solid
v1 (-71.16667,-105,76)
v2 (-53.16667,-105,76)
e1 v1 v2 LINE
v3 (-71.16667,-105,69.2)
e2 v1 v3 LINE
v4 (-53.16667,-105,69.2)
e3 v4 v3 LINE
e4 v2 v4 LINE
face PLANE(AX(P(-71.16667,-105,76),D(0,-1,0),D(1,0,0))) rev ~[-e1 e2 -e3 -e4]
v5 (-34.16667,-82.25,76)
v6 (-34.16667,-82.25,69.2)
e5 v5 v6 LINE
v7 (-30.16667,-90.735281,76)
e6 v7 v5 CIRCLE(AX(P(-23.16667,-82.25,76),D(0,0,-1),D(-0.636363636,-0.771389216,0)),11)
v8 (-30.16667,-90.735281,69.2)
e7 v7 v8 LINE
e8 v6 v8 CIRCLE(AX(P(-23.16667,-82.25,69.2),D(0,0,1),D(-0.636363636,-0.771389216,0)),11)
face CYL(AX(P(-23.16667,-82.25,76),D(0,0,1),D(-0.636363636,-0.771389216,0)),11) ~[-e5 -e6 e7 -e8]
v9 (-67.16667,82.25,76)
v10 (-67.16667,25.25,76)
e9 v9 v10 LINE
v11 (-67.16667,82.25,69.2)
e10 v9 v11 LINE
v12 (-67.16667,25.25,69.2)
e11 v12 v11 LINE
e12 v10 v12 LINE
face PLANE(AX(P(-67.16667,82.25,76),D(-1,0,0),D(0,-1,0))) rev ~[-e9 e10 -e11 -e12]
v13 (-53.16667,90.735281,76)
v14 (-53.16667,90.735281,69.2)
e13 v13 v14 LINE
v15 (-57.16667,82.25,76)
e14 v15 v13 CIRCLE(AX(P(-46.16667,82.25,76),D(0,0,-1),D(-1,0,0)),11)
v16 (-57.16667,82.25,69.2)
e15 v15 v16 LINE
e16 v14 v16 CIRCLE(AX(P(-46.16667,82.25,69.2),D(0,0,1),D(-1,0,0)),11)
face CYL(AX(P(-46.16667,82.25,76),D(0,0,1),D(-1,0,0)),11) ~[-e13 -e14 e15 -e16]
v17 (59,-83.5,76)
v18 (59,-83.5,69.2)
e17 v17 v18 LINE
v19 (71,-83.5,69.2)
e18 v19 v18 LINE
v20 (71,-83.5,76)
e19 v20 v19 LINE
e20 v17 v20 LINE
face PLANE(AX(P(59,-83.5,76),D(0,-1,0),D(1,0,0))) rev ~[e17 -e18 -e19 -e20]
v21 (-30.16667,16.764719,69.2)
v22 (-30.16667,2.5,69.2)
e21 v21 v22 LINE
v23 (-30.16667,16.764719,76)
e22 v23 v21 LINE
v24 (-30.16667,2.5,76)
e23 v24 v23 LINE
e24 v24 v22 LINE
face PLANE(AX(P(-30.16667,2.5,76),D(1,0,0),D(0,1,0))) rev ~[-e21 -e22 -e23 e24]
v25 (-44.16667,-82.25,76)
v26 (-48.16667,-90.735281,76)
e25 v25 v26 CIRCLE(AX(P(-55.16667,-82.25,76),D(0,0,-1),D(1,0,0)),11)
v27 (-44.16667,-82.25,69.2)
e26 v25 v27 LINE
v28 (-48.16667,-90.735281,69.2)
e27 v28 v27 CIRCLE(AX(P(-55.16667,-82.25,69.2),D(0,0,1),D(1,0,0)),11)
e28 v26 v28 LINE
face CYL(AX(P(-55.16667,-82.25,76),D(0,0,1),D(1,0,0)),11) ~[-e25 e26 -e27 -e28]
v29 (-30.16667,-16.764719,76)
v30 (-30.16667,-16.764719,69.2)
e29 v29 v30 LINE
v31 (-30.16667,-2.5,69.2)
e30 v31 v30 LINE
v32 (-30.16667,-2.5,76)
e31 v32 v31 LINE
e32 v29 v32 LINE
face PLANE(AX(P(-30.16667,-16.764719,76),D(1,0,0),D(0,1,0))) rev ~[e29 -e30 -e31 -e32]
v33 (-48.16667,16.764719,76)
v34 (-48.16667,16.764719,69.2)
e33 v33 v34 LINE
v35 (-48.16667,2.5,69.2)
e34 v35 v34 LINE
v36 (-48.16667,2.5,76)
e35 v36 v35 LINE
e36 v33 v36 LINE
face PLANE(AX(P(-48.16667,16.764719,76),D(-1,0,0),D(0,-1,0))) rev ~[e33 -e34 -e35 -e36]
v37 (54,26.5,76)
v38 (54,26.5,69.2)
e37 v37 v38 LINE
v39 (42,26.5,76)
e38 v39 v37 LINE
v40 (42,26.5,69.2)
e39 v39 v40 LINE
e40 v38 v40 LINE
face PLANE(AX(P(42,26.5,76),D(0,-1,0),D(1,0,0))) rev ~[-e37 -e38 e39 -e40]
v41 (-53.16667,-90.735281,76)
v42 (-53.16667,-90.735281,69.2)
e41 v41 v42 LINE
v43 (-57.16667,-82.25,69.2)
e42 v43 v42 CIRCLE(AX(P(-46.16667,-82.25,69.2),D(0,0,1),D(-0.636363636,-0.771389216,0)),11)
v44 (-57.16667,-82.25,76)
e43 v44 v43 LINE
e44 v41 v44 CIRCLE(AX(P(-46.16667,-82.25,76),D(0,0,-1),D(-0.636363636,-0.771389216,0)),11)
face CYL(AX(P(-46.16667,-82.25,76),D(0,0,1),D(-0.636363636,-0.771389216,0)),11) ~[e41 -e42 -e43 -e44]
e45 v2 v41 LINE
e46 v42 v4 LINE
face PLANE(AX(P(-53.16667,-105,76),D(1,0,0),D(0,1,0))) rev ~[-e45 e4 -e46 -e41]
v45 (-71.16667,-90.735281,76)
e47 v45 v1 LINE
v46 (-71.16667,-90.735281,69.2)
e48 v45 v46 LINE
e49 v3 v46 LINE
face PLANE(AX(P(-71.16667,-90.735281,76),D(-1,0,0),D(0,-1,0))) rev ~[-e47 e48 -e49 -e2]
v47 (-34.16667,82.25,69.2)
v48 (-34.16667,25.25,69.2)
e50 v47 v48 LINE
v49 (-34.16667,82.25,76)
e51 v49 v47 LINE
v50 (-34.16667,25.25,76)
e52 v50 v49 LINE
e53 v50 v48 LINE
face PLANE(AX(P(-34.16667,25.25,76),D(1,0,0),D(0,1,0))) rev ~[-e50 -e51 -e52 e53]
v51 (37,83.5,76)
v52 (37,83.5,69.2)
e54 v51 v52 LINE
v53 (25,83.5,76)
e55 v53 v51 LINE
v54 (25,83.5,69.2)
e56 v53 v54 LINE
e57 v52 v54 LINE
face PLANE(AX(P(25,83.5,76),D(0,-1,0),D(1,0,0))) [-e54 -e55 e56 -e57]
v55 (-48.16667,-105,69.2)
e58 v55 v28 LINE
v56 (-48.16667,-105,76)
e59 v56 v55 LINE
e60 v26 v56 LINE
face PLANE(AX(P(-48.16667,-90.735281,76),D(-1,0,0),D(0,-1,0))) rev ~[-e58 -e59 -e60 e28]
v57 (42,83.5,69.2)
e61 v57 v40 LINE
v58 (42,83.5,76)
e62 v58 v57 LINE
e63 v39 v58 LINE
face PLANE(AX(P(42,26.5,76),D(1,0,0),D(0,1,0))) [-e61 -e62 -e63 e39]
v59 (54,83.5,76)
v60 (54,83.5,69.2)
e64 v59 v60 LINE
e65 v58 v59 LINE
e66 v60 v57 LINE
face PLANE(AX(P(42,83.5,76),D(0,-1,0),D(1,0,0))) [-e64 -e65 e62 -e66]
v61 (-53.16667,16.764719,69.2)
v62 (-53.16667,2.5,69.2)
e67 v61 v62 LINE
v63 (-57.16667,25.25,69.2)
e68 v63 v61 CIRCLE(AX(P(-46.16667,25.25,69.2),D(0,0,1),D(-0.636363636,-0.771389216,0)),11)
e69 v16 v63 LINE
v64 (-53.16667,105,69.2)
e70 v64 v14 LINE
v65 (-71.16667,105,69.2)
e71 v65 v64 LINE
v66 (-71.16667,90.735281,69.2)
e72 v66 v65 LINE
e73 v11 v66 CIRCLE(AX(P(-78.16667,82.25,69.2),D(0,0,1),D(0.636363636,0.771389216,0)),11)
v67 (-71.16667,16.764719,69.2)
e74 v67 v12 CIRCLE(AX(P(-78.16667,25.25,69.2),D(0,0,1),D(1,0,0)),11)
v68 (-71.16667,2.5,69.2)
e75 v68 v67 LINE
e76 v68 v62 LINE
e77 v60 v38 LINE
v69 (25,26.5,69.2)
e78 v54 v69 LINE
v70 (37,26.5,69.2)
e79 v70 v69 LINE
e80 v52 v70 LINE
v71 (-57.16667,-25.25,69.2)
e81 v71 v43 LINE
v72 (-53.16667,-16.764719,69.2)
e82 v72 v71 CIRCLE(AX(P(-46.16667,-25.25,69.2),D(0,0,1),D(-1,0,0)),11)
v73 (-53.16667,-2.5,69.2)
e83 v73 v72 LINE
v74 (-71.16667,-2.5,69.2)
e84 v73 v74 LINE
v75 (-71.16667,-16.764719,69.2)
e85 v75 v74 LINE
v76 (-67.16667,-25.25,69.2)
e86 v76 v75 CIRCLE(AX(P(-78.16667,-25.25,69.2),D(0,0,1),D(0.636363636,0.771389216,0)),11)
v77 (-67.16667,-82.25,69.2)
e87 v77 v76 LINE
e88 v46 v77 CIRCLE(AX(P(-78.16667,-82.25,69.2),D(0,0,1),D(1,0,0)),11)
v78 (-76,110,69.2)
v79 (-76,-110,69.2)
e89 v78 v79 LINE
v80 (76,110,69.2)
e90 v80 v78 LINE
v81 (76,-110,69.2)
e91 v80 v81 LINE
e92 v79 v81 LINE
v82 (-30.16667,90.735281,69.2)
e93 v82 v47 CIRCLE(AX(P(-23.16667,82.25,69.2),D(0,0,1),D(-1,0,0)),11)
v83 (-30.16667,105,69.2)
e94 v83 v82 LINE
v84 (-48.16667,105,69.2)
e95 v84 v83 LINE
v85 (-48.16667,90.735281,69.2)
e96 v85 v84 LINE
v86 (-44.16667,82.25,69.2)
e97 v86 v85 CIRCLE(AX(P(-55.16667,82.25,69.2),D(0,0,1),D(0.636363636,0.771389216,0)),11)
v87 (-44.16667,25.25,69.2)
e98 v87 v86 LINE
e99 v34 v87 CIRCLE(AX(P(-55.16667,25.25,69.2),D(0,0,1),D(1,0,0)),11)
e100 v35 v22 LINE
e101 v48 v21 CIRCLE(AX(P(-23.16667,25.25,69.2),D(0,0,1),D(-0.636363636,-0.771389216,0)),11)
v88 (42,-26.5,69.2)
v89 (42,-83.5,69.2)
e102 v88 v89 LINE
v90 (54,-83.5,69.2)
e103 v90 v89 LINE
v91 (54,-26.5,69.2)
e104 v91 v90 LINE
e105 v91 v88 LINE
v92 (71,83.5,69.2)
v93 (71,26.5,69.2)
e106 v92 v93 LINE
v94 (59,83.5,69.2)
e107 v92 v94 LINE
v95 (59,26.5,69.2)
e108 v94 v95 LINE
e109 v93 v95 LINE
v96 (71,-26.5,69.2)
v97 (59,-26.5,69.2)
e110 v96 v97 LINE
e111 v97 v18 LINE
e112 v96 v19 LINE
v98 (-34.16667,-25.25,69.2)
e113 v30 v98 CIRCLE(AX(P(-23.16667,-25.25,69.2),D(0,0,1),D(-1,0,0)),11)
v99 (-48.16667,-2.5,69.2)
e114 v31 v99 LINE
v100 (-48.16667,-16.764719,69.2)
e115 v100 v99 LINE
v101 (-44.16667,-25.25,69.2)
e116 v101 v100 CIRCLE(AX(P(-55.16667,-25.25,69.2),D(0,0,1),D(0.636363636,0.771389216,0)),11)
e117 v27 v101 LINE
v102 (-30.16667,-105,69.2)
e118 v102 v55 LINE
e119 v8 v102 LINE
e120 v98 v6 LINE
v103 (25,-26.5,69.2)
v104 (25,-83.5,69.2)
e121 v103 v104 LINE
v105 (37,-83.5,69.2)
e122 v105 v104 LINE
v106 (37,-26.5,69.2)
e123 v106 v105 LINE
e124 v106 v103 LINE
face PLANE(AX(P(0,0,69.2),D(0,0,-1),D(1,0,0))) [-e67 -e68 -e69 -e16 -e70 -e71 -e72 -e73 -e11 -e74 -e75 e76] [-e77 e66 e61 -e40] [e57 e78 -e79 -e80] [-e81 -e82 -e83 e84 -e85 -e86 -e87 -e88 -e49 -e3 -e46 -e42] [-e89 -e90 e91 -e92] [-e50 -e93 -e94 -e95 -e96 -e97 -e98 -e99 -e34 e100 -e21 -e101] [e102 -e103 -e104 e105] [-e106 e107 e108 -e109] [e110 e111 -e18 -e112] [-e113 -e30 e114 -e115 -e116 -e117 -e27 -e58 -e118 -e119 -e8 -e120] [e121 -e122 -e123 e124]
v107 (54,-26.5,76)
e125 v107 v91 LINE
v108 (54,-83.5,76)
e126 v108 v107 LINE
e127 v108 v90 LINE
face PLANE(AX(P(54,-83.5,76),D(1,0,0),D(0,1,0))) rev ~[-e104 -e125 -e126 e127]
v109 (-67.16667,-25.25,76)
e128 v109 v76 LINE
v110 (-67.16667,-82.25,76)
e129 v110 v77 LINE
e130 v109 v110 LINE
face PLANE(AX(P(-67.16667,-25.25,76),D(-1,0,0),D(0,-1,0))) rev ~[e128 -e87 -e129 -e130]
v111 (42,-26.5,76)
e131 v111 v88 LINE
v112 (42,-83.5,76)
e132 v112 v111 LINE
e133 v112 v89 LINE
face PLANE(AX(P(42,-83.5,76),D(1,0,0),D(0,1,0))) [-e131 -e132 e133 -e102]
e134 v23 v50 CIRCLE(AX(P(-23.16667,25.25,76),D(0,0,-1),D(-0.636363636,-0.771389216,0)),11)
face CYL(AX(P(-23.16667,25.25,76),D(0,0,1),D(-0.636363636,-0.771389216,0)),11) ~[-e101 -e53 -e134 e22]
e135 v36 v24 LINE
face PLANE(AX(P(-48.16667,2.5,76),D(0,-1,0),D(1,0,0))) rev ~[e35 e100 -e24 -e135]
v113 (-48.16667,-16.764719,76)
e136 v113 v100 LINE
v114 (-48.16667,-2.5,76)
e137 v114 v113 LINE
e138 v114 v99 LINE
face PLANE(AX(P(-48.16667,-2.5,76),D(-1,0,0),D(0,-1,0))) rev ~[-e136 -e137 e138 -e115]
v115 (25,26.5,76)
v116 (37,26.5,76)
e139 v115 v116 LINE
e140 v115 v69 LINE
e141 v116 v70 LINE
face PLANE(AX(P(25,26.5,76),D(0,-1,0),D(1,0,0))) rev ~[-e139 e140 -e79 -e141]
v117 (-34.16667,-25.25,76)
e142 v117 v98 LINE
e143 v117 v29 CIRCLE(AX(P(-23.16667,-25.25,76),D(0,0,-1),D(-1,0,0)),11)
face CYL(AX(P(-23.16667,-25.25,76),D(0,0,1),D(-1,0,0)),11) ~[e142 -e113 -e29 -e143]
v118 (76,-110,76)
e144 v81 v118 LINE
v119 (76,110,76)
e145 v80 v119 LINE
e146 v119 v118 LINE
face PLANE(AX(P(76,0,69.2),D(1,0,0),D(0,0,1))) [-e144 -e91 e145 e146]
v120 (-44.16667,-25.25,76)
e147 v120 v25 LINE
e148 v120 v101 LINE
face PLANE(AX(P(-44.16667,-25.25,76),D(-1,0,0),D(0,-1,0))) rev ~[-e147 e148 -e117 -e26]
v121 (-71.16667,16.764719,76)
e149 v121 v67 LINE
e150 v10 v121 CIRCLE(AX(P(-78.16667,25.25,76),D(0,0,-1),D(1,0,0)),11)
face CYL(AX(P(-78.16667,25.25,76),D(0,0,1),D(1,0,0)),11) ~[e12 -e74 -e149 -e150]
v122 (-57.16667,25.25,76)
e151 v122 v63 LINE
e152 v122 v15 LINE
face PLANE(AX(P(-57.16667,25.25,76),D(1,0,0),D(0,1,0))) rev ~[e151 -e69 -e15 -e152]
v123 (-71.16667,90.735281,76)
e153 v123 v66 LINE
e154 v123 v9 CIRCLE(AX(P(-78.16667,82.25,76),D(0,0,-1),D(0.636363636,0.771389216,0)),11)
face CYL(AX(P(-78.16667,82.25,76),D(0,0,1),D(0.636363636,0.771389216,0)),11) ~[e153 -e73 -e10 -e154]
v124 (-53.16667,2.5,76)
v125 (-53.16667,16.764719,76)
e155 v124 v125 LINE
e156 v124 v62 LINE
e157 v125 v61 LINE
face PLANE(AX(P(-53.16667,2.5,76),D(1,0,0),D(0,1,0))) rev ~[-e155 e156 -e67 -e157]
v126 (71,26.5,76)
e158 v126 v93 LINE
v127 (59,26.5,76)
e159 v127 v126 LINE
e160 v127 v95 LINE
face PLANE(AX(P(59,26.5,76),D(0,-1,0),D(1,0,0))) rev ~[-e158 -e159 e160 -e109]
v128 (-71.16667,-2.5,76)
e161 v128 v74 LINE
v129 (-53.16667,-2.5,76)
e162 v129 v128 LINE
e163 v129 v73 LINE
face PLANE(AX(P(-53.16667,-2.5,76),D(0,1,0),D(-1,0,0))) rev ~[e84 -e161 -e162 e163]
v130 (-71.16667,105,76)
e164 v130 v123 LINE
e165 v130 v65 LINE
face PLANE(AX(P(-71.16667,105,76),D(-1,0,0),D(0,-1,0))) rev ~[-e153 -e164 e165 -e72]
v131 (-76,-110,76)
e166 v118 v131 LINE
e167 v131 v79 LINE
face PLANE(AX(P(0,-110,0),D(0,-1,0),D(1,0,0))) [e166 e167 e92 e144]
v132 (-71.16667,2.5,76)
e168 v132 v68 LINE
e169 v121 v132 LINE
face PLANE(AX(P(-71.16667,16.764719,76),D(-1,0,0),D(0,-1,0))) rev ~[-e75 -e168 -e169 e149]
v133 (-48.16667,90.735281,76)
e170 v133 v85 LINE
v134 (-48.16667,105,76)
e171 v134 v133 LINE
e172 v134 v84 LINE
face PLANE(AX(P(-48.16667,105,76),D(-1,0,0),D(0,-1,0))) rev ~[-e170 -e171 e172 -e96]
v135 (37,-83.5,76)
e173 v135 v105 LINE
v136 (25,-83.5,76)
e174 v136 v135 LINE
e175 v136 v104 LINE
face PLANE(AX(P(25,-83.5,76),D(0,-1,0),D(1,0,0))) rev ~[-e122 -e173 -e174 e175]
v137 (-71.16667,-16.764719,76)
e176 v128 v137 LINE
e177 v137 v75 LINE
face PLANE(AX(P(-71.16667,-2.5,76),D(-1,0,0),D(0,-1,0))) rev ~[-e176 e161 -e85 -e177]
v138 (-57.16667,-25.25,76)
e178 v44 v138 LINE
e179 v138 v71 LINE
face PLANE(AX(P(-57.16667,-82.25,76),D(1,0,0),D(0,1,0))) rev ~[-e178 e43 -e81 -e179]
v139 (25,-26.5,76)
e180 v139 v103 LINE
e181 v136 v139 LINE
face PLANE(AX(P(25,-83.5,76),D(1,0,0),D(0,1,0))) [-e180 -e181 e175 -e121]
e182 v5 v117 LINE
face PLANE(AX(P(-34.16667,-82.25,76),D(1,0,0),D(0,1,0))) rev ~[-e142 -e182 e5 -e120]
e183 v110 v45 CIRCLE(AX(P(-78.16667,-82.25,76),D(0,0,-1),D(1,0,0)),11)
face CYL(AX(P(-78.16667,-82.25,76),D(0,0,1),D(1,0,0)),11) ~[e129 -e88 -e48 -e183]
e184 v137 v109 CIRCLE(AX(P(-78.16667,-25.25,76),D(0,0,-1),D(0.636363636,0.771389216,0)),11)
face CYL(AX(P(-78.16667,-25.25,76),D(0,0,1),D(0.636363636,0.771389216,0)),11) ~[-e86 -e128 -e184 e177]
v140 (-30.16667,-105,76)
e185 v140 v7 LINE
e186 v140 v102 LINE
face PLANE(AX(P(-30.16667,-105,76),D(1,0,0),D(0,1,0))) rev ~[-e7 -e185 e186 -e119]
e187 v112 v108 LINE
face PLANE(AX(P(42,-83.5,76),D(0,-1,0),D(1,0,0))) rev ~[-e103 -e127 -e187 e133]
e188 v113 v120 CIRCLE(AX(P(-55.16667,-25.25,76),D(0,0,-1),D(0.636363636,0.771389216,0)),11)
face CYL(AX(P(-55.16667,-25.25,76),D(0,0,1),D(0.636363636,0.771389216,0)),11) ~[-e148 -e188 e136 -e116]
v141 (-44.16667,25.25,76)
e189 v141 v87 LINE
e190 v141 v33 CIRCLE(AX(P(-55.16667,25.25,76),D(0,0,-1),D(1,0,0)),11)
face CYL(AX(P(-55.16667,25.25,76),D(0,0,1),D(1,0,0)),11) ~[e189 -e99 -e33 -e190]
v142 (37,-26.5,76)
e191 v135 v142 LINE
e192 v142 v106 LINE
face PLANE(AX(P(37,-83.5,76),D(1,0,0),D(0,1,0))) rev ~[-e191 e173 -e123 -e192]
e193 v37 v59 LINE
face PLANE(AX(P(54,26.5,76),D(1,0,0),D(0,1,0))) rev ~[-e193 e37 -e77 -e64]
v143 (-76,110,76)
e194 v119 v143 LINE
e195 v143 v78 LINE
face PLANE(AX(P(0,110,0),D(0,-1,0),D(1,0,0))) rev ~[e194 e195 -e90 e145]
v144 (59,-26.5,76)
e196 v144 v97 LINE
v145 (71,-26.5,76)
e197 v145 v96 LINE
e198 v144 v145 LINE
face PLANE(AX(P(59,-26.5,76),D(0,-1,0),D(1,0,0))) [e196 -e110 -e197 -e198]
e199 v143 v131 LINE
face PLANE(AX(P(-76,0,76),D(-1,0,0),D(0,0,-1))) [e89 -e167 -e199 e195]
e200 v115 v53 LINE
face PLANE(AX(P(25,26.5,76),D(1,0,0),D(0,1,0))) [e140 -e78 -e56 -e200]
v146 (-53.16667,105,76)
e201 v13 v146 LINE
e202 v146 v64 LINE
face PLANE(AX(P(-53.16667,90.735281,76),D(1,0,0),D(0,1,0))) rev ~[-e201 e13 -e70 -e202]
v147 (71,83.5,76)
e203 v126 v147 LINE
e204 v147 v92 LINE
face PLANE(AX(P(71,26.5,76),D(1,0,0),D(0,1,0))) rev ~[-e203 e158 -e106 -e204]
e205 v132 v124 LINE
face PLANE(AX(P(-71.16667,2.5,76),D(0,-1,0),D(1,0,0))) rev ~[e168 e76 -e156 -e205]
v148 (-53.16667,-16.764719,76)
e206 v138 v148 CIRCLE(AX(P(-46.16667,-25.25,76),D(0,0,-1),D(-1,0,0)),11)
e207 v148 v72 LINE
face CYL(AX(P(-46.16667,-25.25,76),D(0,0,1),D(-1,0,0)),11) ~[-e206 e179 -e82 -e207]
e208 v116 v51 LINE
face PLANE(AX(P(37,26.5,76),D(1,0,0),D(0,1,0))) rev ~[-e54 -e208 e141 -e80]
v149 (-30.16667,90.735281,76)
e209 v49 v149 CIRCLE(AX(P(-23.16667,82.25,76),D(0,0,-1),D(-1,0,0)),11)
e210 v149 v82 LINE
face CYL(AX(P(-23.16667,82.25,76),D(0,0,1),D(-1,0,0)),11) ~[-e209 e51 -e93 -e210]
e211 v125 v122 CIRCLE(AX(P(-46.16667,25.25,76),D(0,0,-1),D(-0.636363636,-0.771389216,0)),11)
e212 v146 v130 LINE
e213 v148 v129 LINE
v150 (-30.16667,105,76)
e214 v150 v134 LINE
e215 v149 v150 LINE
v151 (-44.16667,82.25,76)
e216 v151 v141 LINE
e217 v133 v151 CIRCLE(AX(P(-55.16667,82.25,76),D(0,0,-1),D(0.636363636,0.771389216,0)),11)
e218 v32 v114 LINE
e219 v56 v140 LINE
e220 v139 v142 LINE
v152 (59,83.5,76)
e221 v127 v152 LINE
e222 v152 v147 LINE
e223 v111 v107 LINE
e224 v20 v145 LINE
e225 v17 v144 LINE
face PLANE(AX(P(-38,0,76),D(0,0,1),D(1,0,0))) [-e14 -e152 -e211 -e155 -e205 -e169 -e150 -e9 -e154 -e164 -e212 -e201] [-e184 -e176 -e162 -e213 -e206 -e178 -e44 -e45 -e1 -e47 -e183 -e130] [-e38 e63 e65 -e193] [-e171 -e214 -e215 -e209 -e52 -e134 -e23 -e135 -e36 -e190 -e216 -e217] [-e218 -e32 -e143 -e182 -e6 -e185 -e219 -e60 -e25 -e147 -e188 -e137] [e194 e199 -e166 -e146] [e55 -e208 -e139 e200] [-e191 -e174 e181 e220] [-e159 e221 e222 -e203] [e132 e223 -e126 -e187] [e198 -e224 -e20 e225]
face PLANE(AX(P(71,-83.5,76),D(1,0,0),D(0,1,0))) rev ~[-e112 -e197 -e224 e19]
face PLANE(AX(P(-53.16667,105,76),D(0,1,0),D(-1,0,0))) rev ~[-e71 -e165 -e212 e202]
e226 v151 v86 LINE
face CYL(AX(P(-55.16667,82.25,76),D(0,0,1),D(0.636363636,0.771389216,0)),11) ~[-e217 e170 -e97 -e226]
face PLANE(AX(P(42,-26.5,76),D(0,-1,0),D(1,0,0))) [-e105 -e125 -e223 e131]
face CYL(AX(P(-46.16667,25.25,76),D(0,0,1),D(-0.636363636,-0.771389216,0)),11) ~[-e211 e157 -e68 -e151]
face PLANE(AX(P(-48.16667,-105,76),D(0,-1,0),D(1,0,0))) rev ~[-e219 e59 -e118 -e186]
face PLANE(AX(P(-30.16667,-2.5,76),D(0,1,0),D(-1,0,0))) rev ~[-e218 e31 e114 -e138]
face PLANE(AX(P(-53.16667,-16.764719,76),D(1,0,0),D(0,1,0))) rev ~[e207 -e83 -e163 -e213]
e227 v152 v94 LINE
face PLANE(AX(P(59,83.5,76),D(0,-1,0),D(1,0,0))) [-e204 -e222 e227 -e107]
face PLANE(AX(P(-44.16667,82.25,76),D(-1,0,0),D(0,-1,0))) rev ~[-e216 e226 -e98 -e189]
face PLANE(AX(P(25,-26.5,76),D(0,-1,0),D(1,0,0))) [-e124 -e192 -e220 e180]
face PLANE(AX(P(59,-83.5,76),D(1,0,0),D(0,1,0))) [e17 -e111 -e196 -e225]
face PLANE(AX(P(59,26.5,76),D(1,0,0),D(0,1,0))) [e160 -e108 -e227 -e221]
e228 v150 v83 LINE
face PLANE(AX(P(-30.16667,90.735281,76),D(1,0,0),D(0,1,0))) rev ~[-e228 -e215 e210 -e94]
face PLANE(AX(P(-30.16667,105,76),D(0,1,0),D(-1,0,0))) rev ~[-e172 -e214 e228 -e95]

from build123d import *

# Parameters (mm, degrees)
F1_DEPTH = 110
F2_W     = 76
F2_H     = 8
F3_DEPTH = 152
F4_W     = 12
F4_H     = 57
F5_DEPTH = 152
F6_W     = 152
F6_H     = 220
F6_W_2   = 12
F6_H_2   = 57
F7_DEPTH = 145.2


# Not quite as in the source:
# - a feature names something its author has since deleted; it is built from what else it names


with BuildPart() as f1:
    # F0 (on Front) → F1 (new body, symmetric)
    with BuildSketch(Plane.XZ):
        with BuildLine():
            ThreePointArc((11.95, -69.2), (5.6567496474, -66.5932503526), (3.05, -60.3))
            Line((3.05, -60.3), (3.05, 60.3))
            ThreePointArc((3.05, 60.3), (5.6567496474, 66.5932503526), (11.95, 69.2))
            Line((11.95, 69.2), (76, 69.2))
            Line((76, 69.2), (76, 76))
            Line((76, 76), (-76, 76))
            Line((-76, 76), (-76, 69.2))
            Line((-76, 69.2), (-11.95, 69.2))
            ThreePointArc((-11.95, 69.2), (-5.6567496474, 66.5932503526), (-3.05, 60.3))
            Line((-3.05, 60.3), (-3.05, -60.3))
            ThreePointArc((-3.05, -60.3), (-5.6567496474, -66.5932503526), (-11.95, -69.2))
            Line((-11.95, -69.2), (-76, -69.2))
            Line((-76, -69.2), (-76, -76))
            Line((-76, -76), (76, -76))
            Line((76, -76), (76, -69.2))
            Line((76, -69.2), (11.95, -69.2))
        make_face()
    extrude(amount=F1_DEPTH, both=True)

    # F2 (on face) → F3 (join)
    with BuildSketch(Plane.XY.offset(76)):
        with Locations((-38, 0)):
            Rectangle(F2_W, F2_H)
    extrude(amount=-F3_DEPTH)

    # F4 (on face) → F5 (cut)
    with BuildSketch(Plane.XY.offset(76)):
        with BuildLine():
            ThreePointArc((-48.16667, 90.7352813742), (-45.2167956289, 86.9404157598), (-44.16667, 82.25))
            Line((-44.16667, 82.25), (-44.16667, 25.25))
            ThreePointArc((-44.16667, 25.25), (-45.2167956289, 20.5595842402), (-48.16667, 16.7647186258))
            Line((-48.16667, 16.7647186258), (-48.16667, 2.5))
            Line((-48.16667, 2.5), (-30.16667, 2.5))
            Line((-30.16667, 2.5), (-30.16667, 16.7647186258))
            ThreePointArc((-30.16667, 16.7647186258), (-33.1165443711, 20.5595842402), (-34.16667, 25.25))
            Line((-34.16667, 25.25), (-34.16667, 82.25))
            ThreePointArc((-34.16667, 82.25), (-33.1165443711, 86.9404157598), (-30.16667, 90.7352813742))
            Line((-30.16667, 90.7352813742), (-30.16667, 105))
            Line((-30.16667, 105), (-48.16667, 105))
            Line((-48.16667, 105), (-48.16667, 90.7352813742))
        make_face()
        with BuildLine():
            Line((-71.16667, 2.5), (-53.16667, 2.5))
            Line((-53.16667, 2.5), (-53.16667, 16.7647186258))
            ThreePointArc((-53.16667, 16.7647186258), (-56.1165443711, 20.5595842402), (-57.16667, 25.25))
            Line((-57.16667, 25.25), (-57.16667, 82.25))
            ThreePointArc((-57.16667, 82.25), (-56.1165443711, 86.9404157598), (-53.16667, 90.7352813742))
            Line((-53.16667, 90.7352813742), (-53.16667, 105))
            Line((-53.16667, 105), (-71.16667, 105))
            Line((-71.16667, 105), (-71.16667, 90.7352813742))
            ThreePointArc((-71.16667, 90.7352813742), (-68.2167956289, 86.9404157598), (-67.16667, 82.25))
            Line((-67.16667, 82.25), (-67.16667, 25.25))
            ThreePointArc((-67.16667, 25.25), (-68.2167956289, 20.5595842402), (-71.16667, 16.7647186258))
            Line((-71.16667, 16.7647186258), (-71.16667, 2.5))
        make_face()
        with Locations((31, 55)):
            Rectangle(F4_W, F4_H)
        with Locations((48, 55)):
            Rectangle(F4_W, F4_H)
        with Locations((65, 55)):
            Rectangle(F4_W, F4_H)
        with Locations((31, -55)):
            Rectangle(F4_W, F4_H)
        with Locations((48, -55)):
            Rectangle(F4_W, F4_H)
        with Locations((65, -55)):
            Rectangle(F4_W, F4_H)
        with BuildLine():
            Line((-71.16667, -105), (-53.16667, -105))
            Line((-53.16667, -105), (-53.16667, -90.7352813742))
            ThreePointArc((-53.16667, -90.7352813742), (-56.1165443711, -86.9404157598), (-57.16667, -82.25))
            Line((-57.16667, -82.25), (-57.16667, -25.25))
            ThreePointArc((-57.16667, -25.25), (-56.1165443711, -20.5595842402), (-53.16667, -16.7647186258))
            Line((-53.16667, -16.7647186258), (-53.16667, -2.5))
            Line((-53.16667, -2.5), (-71.16667, -2.5))
            Line((-71.16667, -2.5), (-71.16667, -16.7647186258))
            ThreePointArc((-71.16667, -16.7647186258), (-68.2167956289, -20.5595842402), (-67.16667, -25.25))
            Line((-67.16667, -25.25), (-67.16667, -82.25))
            ThreePointArc((-67.16667, -82.25), (-68.2167956289, -86.9404157598), (-71.16667, -90.7352813742))
            Line((-71.16667, -90.7352813742), (-71.16667, -105))
        make_face()
        with BuildLine():
            ThreePointArc((-48.16667, -16.7647186258), (-45.2167956289, -20.5595842402), (-44.16667, -25.25))
            Line((-44.16667, -25.25), (-44.16667, -82.25))
            ThreePointArc((-44.16667, -82.25), (-45.2167956289, -86.9404157598), (-48.16667, -90.7352813742))
            Line((-48.16667, -90.7352813742), (-48.16667, -105))
            Line((-48.16667, -105), (-30.16667, -105))
            Line((-30.16667, -105), (-30.16667, -90.7352813742))
            ThreePointArc((-30.16667, -90.7352813742), (-33.1165443711, -86.9404157598), (-34.16667, -82.25))
            Line((-34.16667, -82.25), (-34.16667, -25.25))
            ThreePointArc((-34.16667, -25.25), (-33.1165443711, -20.5595842402), (-30.16667, -16.7647186258))
            Line((-30.16667, -16.7647186258), (-30.16667, -2.5))
            Line((-30.16667, -2.5), (-48.16667, -2.5))
            Line((-48.16667, -2.5), (-48.16667, -16.7647186258))
        make_face()
    extrude(amount=-F5_DEPTH, mode=Mode.SUBTRACT)

    # F6 (on face) → F7 (cut)
    with BuildSketch(Plane(origin=(0, 0, -76), x_dir=(1, 0, 0), z_dir=(0, 0, -1))):
        Rectangle(F6_W, F6_H)
        with BuildLine():
            Line((-67.16667, -82.25), (-67.16667, -25.25))
            ThreePointArc((-67.16667, -25.25), (-68.2167956289, -20.5595842402), (-71.16667, -16.7647186258))
            Line((-71.16667, -16.7647186258), (-71.16667, -2.5))
            Line((-71.16667, -2.5), (-53.16667, -2.5))
            Line((-53.16667, -2.5), (-53.16667, -16.7647186258))
            ThreePointArc((-53.16667, -16.7647186258), (-56.1165443711, -20.5595842402), (-57.16667, -25.25))
            Line((-57.16667, -25.25), (-57.16667, -82.25))
            ThreePointArc((-57.16667, -82.25), (-56.1165443711, -86.9404157598), (-53.16667, -90.7352813742))
            Line((-53.16667, -90.7352813742), (-53.16667, -105))
            Line((-53.16667, -105), (-71.16667, -105))
            Line((-71.16667, -105), (-71.16667, -90.7352813742))
            ThreePointArc((-71.16667, -90.7352813742), (-68.2167956289, -86.9404157598), (-67.16667, -82.25))
        make_face(mode=Mode.SUBTRACT)
        with BuildLine():
            Line((-30.16667, -105), (-48.16667, -105))
            Line((-48.16667, -105), (-48.16667, -90.7352813742))
            ThreePointArc((-48.16667, -90.7352813742), (-45.2167956289, -86.9404157598), (-44.16667, -82.25))
            Line((-44.16667, -82.25), (-44.16667, -25.25))
            ThreePointArc((-44.16667, -25.25), (-45.2167956289, -20.5595842402), (-48.16667, -16.7647186258))
            Line((-48.16667, -16.7647186258), (-48.16667, -2.5))
            Line((-48.16667, -2.5), (-30.16667, -2.5))
            Line((-30.16667, -2.5), (-30.16667, -16.7647186258))
            ThreePointArc((-30.16667, -16.7647186258), (-33.1165443711, -20.5595842402), (-34.16667, -25.25))
            Line((-34.16667, -25.25), (-34.16667, -82.25))
            ThreePointArc((-34.16667, -82.25), (-33.1165443711, -86.9404157598), (-30.16667, -90.7352813742))
            Line((-30.16667, -90.7352813742), (-30.16667, -105))
        make_face(mode=Mode.SUBTRACT)
        with Locations((31, -55)):
            Rectangle(F6_W_2, F6_H_2, mode=Mode.SUBTRACT)
        with Locations((48, -55)):
            Rectangle(F6_W_2, F6_H_2, mode=Mode.SUBTRACT)
        with Locations((65, -55)):
            Rectangle(F6_W_2, F6_H_2, mode=Mode.SUBTRACT)
        with BuildLine():
            ThreePointArc((-67.16667, 82.25), (-68.2167956289, 86.9404157598), (-71.16667, 90.7352813742))
            Line((-71.16667, 90.7352813742), (-71.16667, 105))
            Line((-71.16667, 105), (-53.16667, 105))
            Line((-53.16667, 105), (-53.16667, 90.7352813742))
            ThreePointArc((-53.16667, 90.7352813742), (-56.1165443711, 86.9404157598), (-57.16667, 82.25))
            Line((-57.16667, 82.25), (-57.16667, 25.25))
            ThreePointArc((-57.16667, 25.25), (-56.1165443711, 20.5595842402), (-53.16667, 16.7647186258))
            Line((-53.16667, 16.7647186258), (-53.16667, 2.5))
            Line((-53.16667, 2.5), (-71.16667, 2.5))
            Line((-71.16667, 2.5), (-71.16667, 16.7647186258))
            ThreePointArc((-71.16667, 16.7647186258), (-68.2167956289, 20.5595842402), (-67.16667, 25.25))
            Line((-67.16667, 25.25), (-67.16667, 82.25))
        make_face(mode=Mode.SUBTRACT)
        with BuildLine():
            Line((-30.16667, 2.5), (-48.16667, 2.5))
            Line((-48.16667, 2.5), (-48.16667, 16.7647186258))
            ThreePointArc((-48.16667, 16.7647186258), (-45.2167956289, 20.5595842402), (-44.16667, 25.25))
            Line((-44.16667, 25.25), (-44.16667, 82.25))
            ThreePointArc((-44.16667, 82.25), (-45.2167956289, 86.9404157598), (-48.16667, 90.7352813742))
            Line((-48.16667, 90.7352813742), (-48.16667, 105))
            Line((-48.16667, 105), (-30.16667, 105))
            Line((-30.16667, 105), (-30.16667, 90.7352813742))
            ThreePointArc((-30.16667, 90.7352813742), (-33.1165443711, 86.9404157598), (-34.16667, 82.25))
            Line((-34.16667, 82.25), (-34.16667, 25.25))
            ThreePointArc((-34.16667, 25.25), (-33.1165443711, 20.5595842402), (-30.16667, 16.7647186258))
            Line((-30.16667, 16.7647186258), (-30.16667, 2.5))
        make_face(mode=Mode.SUBTRACT)
        with Locations((31, 55)):
            Rectangle(F6_W_2, F6_H_2, mode=Mode.SUBTRACT)
        with Locations((48, 55)):
            Rectangle(F6_W_2, F6_H_2, mode=Mode.SUBTRACT)
        with Locations((65, 55)):
            Rectangle(F6_W_2, F6_H_2, mode=Mode.SUBTRACT)
    extrude(amount=-F7_DEPTH, mode=Mode.SUBTRACT)


solid = f1.part
